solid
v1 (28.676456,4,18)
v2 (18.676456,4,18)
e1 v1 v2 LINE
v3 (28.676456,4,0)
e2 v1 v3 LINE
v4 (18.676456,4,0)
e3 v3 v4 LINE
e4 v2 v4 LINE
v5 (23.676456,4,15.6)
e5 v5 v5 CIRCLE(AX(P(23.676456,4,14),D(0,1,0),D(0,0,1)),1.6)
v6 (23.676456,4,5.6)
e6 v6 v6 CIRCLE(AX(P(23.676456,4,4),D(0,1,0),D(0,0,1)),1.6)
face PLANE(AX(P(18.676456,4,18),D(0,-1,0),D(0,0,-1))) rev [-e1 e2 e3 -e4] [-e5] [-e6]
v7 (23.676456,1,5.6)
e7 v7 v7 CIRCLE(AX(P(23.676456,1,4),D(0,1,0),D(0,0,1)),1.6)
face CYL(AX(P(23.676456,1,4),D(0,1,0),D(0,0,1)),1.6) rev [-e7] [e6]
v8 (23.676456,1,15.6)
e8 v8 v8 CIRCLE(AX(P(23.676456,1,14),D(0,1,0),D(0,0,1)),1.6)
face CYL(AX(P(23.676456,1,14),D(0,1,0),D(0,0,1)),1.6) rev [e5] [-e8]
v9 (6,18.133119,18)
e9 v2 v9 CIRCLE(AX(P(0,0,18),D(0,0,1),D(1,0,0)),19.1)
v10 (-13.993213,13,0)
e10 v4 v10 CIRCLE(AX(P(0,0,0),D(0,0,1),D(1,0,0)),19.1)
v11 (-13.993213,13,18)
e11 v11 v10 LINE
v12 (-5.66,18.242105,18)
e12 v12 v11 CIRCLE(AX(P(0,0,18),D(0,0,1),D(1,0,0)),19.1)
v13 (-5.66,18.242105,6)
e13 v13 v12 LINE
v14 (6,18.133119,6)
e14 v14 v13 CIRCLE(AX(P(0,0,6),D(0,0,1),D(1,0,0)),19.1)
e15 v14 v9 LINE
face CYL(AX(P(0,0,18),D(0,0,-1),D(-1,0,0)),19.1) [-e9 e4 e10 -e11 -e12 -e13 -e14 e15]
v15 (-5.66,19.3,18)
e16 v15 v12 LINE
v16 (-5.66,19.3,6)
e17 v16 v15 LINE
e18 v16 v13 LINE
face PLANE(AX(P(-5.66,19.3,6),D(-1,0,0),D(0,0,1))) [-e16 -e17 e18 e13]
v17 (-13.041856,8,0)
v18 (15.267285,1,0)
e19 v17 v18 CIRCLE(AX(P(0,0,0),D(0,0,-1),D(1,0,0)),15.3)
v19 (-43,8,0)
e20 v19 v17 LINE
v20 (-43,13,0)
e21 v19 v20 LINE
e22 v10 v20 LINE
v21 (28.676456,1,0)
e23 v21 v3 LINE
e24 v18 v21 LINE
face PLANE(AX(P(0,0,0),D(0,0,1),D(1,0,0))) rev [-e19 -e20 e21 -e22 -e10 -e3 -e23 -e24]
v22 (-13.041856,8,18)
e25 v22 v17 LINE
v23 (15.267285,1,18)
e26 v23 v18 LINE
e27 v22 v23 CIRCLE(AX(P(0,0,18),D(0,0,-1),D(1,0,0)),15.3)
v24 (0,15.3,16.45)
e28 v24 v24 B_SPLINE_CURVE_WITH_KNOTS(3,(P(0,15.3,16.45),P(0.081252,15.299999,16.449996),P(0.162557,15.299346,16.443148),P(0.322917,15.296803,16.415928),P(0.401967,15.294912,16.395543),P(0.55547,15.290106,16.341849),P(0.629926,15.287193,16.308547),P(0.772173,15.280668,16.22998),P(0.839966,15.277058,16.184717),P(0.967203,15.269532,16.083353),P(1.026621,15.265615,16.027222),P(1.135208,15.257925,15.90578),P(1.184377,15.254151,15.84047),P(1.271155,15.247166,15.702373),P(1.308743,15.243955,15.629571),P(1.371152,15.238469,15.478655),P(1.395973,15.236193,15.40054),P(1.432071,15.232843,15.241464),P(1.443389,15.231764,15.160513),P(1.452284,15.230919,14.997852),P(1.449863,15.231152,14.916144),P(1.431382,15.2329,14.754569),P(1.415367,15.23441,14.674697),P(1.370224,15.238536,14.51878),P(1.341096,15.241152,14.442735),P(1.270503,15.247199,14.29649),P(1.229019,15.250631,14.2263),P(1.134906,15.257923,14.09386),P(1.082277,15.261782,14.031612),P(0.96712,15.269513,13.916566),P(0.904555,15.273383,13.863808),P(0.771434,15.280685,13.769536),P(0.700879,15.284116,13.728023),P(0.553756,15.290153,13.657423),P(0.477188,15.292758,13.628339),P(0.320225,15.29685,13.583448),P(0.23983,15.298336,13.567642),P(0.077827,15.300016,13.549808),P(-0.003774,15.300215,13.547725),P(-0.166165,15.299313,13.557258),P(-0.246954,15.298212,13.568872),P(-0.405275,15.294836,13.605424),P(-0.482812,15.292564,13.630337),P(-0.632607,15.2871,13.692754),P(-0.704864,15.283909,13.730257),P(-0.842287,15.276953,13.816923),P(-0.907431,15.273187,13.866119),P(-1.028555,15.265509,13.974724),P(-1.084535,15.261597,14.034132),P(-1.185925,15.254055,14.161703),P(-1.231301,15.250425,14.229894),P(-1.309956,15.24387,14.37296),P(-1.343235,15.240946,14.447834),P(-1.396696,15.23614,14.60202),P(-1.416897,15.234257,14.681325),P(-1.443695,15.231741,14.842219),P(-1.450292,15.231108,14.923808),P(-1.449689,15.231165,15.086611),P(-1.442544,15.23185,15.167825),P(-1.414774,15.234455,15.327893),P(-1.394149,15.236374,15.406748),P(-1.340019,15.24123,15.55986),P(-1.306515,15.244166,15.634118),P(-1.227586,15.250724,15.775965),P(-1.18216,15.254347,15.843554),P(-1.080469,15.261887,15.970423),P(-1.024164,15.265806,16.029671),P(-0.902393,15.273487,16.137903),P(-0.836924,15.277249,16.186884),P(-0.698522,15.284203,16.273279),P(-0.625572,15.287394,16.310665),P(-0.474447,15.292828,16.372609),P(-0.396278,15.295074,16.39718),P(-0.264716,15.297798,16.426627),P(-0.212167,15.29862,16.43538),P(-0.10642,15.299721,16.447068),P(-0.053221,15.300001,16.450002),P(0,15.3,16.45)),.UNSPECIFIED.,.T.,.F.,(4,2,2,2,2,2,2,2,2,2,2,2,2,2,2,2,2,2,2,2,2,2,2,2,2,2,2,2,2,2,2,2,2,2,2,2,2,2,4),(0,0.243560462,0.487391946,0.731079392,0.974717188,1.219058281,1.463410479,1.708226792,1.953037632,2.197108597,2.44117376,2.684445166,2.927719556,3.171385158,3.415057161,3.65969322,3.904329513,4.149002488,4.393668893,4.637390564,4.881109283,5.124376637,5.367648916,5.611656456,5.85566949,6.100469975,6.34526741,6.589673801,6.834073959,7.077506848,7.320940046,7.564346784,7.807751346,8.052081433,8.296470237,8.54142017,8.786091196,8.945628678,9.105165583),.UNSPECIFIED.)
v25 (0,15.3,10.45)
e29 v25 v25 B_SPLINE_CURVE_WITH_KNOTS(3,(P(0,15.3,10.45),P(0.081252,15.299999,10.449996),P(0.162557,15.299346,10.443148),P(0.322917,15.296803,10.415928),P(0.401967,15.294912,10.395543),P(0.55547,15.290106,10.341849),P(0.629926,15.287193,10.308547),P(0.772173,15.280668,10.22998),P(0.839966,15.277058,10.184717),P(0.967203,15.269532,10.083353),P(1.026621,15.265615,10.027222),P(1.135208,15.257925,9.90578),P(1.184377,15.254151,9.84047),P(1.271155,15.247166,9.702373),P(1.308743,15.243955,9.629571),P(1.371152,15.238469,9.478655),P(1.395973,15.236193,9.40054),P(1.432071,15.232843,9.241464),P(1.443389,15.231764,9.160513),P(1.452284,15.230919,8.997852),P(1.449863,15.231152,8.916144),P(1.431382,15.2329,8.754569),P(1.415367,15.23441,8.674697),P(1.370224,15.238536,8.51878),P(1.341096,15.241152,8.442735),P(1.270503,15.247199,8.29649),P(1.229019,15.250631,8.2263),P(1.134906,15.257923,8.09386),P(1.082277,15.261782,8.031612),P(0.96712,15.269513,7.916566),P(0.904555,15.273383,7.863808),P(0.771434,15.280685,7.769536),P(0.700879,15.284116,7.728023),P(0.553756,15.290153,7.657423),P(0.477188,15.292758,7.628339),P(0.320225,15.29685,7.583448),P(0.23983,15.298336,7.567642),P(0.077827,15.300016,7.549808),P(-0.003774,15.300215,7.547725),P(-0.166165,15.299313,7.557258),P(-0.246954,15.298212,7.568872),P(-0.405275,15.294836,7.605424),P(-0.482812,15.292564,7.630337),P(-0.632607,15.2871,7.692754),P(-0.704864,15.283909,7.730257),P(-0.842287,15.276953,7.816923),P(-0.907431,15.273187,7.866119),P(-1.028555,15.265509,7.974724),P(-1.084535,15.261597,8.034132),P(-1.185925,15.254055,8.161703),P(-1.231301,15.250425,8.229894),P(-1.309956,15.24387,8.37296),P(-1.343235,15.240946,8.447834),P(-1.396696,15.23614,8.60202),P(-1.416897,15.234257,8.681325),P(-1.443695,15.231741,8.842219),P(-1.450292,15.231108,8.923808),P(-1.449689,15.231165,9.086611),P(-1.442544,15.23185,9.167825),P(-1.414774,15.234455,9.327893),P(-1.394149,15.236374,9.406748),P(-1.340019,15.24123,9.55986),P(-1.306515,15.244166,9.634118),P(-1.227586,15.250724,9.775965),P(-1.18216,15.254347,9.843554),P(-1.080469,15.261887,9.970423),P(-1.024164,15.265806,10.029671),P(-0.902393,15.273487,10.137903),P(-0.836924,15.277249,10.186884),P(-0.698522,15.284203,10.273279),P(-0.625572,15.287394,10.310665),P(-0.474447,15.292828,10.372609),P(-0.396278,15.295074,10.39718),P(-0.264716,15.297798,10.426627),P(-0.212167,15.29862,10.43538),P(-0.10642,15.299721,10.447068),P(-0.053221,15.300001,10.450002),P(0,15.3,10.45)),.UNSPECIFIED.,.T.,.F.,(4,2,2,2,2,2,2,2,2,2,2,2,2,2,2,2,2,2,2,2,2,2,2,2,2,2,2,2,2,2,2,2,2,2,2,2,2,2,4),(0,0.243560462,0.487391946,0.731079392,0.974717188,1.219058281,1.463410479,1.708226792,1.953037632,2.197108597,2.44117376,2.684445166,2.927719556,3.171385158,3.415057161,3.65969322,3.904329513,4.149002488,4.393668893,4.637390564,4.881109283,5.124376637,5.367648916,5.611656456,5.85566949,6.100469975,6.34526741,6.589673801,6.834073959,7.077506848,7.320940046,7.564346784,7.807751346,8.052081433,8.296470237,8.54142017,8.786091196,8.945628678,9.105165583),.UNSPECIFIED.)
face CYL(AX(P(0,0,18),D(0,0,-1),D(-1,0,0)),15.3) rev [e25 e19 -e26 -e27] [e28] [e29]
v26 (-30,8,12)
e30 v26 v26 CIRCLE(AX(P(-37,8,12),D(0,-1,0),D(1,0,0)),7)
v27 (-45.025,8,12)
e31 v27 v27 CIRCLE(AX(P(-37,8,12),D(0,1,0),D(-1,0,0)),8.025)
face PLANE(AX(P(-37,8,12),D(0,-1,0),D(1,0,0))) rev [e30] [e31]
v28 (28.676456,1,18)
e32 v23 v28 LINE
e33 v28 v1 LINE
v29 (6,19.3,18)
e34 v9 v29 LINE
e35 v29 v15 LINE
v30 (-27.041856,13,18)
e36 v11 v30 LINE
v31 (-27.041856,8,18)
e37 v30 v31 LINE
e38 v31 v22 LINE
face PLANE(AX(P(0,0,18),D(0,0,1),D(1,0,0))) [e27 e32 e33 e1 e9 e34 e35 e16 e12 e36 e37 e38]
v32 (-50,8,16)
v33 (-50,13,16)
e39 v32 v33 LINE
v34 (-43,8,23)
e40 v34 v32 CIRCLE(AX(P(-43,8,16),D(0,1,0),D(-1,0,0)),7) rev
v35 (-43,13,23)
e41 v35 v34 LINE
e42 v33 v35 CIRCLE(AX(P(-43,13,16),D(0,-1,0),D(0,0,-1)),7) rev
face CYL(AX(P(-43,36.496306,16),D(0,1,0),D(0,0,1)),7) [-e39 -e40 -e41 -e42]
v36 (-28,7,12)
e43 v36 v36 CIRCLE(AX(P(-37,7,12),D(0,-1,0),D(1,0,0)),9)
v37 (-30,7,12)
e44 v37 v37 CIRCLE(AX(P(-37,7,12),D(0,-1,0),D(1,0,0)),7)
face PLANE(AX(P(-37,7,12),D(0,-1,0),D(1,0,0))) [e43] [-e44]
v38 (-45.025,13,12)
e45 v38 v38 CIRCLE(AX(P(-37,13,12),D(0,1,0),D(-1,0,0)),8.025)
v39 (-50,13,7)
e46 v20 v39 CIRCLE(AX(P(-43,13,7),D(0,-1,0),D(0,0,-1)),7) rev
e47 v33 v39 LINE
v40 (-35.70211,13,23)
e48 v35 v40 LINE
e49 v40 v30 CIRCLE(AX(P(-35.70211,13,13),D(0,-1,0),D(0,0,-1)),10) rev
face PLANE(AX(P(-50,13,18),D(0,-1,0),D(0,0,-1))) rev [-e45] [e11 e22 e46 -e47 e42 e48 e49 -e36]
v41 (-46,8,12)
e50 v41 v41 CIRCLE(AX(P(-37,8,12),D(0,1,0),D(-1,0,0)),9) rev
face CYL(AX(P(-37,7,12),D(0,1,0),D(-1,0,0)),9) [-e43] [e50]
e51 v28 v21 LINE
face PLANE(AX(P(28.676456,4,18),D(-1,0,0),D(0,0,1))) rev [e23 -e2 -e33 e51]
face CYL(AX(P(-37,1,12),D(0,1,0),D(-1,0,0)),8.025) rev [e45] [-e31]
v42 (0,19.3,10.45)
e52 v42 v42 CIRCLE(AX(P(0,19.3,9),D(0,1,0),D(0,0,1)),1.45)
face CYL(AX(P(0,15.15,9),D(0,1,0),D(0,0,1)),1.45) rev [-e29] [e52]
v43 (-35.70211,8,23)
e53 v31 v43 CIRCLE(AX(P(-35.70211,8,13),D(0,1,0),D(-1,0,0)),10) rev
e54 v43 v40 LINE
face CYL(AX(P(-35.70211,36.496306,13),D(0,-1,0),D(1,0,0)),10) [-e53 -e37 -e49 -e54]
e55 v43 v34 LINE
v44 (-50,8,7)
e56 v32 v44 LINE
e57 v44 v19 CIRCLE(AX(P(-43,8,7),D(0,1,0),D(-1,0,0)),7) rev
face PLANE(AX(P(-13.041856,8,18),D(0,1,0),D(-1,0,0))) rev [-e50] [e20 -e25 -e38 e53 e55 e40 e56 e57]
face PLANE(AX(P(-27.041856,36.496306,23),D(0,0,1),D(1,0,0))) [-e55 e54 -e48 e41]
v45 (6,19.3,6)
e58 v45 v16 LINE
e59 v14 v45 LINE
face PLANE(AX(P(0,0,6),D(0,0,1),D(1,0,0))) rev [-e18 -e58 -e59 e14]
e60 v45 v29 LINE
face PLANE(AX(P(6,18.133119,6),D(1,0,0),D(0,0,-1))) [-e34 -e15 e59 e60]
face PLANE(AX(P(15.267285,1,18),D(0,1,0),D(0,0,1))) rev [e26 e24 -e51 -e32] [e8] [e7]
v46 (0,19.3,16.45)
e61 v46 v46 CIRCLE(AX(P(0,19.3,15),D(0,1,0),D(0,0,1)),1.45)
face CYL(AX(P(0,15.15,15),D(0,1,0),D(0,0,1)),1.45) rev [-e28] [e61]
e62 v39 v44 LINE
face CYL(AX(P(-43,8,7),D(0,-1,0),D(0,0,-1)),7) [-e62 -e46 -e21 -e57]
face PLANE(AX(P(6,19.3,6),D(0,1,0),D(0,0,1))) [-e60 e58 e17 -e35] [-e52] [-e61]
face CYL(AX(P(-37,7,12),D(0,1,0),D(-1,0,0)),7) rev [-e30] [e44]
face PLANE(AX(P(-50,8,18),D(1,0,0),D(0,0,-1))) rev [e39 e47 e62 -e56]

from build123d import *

# Parameters (mm, degrees)
BOSS_EXTRUDE1_DEPTH = 18
SKETCH3_R           = 1.6
CUT_EXTRUDE1_DEPTH  = 56.244999774
SKETCH5_W           = 22.958144304
SKETCH5_H           = 5
BOSS_EXTRUDE2_DEPTH = 5
SKETCH6_R           = 8.025
CUT_EXTRUDE2_DEPTH  = 57.329388422
SKETCH7_R           = 9
SKETCH7_R_2         = 7
BOSS_EXTRUDE3_DEPTH = 1
FILLET1_R           = 7
FILLET2_R           = 10
BOSS_EXTRUDE4_DEPTH = 12
SKETCH9_R           = 1.45
CUT_EXTRUDE3_DEPTH  = 4.15


with BuildPart() as part:
    # Sketch1 → Boss-Extrude1 (new body)
    with BuildSketch(Plane.XY):
        with BuildLine():
            Line((15.267285286, 1), (28.676455767, 1))
            Line((28.676455767, 1), (28.676455767, 4))
            Line((28.676455767, 4), (18.676455767, 4))
            ThreePointArc((18.676455767, 4), (5.072789326, 18.414038353), (-13.99321264, 13))
            Line((-13.99321264, 13), (-50, 13))
            Line((-50, 13), (-50, 8))
            Line((-50, 8), (-13.041855696, 8))
            ThreePointArc((-13.041855696, 8), (3.67261953, 14.852672008), (15.267285286, 1))
        make_face()
    extrude(amount=BOSS_EXTRUDE1_DEPTH)

    # Sketch3 → Cut-Extrude1 (cut, through all)
    with BuildSketch(Plane(origin=(0, 4, 0), x_dir=(1, 0, 0), z_dir=(0, 1, 0))):
        with Locations(Location((23.676455767, -4, 0), (0, 0, 270))):
            Circle(SKETCH3_R)
        with Locations(Location((23.676455767, -14, 0), (0, 0, 270))):
            Circle(SKETCH3_R)
    extrude(amount=-CUT_EXTRUDE1_DEPTH, mode=Mode.SUBTRACT)

    # Sketch5 → Boss-Extrude2 (add)
    with BuildSketch(Plane.XZ.offset(-8)):
        with Locations((-38.520927848, 20.5)):
            Rectangle(SKETCH5_W, SKETCH5_H)
    extrude(amount=-BOSS_EXTRUDE2_DEPTH)

    # Sketch6 → Cut-Extrude2 (cut, through all)
    with BuildSketch(Plane(origin=(0, 13, 0), x_dir=(1, 0, 0), z_dir=(0, 1, 0))):
        with Locations(Location((-37, -12, 0), (0, 0, 180))):
            Circle(SKETCH6_R)
    extrude(amount=-CUT_EXTRUDE2_DEPTH, mode=Mode.SUBTRACT)

    # Sketch7 → Boss-Extrude3 (add)
    with BuildSketch(Plane.XZ.offset(-8)):
        with Locations(Location((-37, 12, 0), (0, 0, 180))):
            Circle(SKETCH7_R)
        with Locations((-37, 12)):
            Circle(SKETCH7_R_2, mode=Mode.SUBTRACT)
    extrude(amount=BOSS_EXTRUDE3_DEPTH)

    # Fillet1
    fillet1_edges = [part.edges().sort_by_distance(p)[0] for p in [
        (-50, 10.5, 23),
        (-50, 10.5, 0),
    ]]
    fillet(fillet1_edges, radius=FILLET1_R)

    # Fillet2
    # the kernel refuses this fillet: 10 mm, written as the material it takes off along each edge
    with BuildSketch(Plane(origin=(-27.041855696, -13.650635095, 23), x_dir=(0, 0, -1), z_dir=(0, 1, 0))) as fillet2_piece_1:
        with BuildLine():
            CenterArc((10, 8.660254038), FILLET2_R, 180, 60)
            Line((0, 8.660254038), (-0.2, 8.660254038))
            Line((-0.2, 8.660254038), (-0.2, 0))
            Line((-0.2, 0), (0, -0.2))
            ThreePointArc((0, -0.2), (2.5, -0.2), (4.9, -0.173205081))
            Line((4.9, -0.173205081), (5, 0))
        make_face()
    extrude(amount=48.301270189, mode=Mode.SUBTRACT)

    # Sketch8 → Boss-Extrude4 (add)
    with BuildSketch(Plane.XY.offset(18)):
        Polygon((6, 18.133118871), (6, 19.3), (-5.66, 19.3), (-5.66, 18.242105142), align=None)
    extrude(amount=-BOSS_EXTRUDE4_DEPTH)

    # Sketch9 → Cut-Extrude3 (cut)
    with BuildSketch(Plane(origin=(0, 19.3, 0), x_dir=(1, 0, 0), z_dir=(0, 1, 0))):
        with Locations(Location((0, -15, 0), (0, 0, 270))):
            Circle(SKETCH9_R)
        with Locations(Location((0, -9, 0), (0, 0, 270))):
            Circle(SKETCH9_R)
    extrude(amount=-CUT_EXTRUDE3_DEPTH, mode=Mode.SUBTRACT)


solid = part.part
